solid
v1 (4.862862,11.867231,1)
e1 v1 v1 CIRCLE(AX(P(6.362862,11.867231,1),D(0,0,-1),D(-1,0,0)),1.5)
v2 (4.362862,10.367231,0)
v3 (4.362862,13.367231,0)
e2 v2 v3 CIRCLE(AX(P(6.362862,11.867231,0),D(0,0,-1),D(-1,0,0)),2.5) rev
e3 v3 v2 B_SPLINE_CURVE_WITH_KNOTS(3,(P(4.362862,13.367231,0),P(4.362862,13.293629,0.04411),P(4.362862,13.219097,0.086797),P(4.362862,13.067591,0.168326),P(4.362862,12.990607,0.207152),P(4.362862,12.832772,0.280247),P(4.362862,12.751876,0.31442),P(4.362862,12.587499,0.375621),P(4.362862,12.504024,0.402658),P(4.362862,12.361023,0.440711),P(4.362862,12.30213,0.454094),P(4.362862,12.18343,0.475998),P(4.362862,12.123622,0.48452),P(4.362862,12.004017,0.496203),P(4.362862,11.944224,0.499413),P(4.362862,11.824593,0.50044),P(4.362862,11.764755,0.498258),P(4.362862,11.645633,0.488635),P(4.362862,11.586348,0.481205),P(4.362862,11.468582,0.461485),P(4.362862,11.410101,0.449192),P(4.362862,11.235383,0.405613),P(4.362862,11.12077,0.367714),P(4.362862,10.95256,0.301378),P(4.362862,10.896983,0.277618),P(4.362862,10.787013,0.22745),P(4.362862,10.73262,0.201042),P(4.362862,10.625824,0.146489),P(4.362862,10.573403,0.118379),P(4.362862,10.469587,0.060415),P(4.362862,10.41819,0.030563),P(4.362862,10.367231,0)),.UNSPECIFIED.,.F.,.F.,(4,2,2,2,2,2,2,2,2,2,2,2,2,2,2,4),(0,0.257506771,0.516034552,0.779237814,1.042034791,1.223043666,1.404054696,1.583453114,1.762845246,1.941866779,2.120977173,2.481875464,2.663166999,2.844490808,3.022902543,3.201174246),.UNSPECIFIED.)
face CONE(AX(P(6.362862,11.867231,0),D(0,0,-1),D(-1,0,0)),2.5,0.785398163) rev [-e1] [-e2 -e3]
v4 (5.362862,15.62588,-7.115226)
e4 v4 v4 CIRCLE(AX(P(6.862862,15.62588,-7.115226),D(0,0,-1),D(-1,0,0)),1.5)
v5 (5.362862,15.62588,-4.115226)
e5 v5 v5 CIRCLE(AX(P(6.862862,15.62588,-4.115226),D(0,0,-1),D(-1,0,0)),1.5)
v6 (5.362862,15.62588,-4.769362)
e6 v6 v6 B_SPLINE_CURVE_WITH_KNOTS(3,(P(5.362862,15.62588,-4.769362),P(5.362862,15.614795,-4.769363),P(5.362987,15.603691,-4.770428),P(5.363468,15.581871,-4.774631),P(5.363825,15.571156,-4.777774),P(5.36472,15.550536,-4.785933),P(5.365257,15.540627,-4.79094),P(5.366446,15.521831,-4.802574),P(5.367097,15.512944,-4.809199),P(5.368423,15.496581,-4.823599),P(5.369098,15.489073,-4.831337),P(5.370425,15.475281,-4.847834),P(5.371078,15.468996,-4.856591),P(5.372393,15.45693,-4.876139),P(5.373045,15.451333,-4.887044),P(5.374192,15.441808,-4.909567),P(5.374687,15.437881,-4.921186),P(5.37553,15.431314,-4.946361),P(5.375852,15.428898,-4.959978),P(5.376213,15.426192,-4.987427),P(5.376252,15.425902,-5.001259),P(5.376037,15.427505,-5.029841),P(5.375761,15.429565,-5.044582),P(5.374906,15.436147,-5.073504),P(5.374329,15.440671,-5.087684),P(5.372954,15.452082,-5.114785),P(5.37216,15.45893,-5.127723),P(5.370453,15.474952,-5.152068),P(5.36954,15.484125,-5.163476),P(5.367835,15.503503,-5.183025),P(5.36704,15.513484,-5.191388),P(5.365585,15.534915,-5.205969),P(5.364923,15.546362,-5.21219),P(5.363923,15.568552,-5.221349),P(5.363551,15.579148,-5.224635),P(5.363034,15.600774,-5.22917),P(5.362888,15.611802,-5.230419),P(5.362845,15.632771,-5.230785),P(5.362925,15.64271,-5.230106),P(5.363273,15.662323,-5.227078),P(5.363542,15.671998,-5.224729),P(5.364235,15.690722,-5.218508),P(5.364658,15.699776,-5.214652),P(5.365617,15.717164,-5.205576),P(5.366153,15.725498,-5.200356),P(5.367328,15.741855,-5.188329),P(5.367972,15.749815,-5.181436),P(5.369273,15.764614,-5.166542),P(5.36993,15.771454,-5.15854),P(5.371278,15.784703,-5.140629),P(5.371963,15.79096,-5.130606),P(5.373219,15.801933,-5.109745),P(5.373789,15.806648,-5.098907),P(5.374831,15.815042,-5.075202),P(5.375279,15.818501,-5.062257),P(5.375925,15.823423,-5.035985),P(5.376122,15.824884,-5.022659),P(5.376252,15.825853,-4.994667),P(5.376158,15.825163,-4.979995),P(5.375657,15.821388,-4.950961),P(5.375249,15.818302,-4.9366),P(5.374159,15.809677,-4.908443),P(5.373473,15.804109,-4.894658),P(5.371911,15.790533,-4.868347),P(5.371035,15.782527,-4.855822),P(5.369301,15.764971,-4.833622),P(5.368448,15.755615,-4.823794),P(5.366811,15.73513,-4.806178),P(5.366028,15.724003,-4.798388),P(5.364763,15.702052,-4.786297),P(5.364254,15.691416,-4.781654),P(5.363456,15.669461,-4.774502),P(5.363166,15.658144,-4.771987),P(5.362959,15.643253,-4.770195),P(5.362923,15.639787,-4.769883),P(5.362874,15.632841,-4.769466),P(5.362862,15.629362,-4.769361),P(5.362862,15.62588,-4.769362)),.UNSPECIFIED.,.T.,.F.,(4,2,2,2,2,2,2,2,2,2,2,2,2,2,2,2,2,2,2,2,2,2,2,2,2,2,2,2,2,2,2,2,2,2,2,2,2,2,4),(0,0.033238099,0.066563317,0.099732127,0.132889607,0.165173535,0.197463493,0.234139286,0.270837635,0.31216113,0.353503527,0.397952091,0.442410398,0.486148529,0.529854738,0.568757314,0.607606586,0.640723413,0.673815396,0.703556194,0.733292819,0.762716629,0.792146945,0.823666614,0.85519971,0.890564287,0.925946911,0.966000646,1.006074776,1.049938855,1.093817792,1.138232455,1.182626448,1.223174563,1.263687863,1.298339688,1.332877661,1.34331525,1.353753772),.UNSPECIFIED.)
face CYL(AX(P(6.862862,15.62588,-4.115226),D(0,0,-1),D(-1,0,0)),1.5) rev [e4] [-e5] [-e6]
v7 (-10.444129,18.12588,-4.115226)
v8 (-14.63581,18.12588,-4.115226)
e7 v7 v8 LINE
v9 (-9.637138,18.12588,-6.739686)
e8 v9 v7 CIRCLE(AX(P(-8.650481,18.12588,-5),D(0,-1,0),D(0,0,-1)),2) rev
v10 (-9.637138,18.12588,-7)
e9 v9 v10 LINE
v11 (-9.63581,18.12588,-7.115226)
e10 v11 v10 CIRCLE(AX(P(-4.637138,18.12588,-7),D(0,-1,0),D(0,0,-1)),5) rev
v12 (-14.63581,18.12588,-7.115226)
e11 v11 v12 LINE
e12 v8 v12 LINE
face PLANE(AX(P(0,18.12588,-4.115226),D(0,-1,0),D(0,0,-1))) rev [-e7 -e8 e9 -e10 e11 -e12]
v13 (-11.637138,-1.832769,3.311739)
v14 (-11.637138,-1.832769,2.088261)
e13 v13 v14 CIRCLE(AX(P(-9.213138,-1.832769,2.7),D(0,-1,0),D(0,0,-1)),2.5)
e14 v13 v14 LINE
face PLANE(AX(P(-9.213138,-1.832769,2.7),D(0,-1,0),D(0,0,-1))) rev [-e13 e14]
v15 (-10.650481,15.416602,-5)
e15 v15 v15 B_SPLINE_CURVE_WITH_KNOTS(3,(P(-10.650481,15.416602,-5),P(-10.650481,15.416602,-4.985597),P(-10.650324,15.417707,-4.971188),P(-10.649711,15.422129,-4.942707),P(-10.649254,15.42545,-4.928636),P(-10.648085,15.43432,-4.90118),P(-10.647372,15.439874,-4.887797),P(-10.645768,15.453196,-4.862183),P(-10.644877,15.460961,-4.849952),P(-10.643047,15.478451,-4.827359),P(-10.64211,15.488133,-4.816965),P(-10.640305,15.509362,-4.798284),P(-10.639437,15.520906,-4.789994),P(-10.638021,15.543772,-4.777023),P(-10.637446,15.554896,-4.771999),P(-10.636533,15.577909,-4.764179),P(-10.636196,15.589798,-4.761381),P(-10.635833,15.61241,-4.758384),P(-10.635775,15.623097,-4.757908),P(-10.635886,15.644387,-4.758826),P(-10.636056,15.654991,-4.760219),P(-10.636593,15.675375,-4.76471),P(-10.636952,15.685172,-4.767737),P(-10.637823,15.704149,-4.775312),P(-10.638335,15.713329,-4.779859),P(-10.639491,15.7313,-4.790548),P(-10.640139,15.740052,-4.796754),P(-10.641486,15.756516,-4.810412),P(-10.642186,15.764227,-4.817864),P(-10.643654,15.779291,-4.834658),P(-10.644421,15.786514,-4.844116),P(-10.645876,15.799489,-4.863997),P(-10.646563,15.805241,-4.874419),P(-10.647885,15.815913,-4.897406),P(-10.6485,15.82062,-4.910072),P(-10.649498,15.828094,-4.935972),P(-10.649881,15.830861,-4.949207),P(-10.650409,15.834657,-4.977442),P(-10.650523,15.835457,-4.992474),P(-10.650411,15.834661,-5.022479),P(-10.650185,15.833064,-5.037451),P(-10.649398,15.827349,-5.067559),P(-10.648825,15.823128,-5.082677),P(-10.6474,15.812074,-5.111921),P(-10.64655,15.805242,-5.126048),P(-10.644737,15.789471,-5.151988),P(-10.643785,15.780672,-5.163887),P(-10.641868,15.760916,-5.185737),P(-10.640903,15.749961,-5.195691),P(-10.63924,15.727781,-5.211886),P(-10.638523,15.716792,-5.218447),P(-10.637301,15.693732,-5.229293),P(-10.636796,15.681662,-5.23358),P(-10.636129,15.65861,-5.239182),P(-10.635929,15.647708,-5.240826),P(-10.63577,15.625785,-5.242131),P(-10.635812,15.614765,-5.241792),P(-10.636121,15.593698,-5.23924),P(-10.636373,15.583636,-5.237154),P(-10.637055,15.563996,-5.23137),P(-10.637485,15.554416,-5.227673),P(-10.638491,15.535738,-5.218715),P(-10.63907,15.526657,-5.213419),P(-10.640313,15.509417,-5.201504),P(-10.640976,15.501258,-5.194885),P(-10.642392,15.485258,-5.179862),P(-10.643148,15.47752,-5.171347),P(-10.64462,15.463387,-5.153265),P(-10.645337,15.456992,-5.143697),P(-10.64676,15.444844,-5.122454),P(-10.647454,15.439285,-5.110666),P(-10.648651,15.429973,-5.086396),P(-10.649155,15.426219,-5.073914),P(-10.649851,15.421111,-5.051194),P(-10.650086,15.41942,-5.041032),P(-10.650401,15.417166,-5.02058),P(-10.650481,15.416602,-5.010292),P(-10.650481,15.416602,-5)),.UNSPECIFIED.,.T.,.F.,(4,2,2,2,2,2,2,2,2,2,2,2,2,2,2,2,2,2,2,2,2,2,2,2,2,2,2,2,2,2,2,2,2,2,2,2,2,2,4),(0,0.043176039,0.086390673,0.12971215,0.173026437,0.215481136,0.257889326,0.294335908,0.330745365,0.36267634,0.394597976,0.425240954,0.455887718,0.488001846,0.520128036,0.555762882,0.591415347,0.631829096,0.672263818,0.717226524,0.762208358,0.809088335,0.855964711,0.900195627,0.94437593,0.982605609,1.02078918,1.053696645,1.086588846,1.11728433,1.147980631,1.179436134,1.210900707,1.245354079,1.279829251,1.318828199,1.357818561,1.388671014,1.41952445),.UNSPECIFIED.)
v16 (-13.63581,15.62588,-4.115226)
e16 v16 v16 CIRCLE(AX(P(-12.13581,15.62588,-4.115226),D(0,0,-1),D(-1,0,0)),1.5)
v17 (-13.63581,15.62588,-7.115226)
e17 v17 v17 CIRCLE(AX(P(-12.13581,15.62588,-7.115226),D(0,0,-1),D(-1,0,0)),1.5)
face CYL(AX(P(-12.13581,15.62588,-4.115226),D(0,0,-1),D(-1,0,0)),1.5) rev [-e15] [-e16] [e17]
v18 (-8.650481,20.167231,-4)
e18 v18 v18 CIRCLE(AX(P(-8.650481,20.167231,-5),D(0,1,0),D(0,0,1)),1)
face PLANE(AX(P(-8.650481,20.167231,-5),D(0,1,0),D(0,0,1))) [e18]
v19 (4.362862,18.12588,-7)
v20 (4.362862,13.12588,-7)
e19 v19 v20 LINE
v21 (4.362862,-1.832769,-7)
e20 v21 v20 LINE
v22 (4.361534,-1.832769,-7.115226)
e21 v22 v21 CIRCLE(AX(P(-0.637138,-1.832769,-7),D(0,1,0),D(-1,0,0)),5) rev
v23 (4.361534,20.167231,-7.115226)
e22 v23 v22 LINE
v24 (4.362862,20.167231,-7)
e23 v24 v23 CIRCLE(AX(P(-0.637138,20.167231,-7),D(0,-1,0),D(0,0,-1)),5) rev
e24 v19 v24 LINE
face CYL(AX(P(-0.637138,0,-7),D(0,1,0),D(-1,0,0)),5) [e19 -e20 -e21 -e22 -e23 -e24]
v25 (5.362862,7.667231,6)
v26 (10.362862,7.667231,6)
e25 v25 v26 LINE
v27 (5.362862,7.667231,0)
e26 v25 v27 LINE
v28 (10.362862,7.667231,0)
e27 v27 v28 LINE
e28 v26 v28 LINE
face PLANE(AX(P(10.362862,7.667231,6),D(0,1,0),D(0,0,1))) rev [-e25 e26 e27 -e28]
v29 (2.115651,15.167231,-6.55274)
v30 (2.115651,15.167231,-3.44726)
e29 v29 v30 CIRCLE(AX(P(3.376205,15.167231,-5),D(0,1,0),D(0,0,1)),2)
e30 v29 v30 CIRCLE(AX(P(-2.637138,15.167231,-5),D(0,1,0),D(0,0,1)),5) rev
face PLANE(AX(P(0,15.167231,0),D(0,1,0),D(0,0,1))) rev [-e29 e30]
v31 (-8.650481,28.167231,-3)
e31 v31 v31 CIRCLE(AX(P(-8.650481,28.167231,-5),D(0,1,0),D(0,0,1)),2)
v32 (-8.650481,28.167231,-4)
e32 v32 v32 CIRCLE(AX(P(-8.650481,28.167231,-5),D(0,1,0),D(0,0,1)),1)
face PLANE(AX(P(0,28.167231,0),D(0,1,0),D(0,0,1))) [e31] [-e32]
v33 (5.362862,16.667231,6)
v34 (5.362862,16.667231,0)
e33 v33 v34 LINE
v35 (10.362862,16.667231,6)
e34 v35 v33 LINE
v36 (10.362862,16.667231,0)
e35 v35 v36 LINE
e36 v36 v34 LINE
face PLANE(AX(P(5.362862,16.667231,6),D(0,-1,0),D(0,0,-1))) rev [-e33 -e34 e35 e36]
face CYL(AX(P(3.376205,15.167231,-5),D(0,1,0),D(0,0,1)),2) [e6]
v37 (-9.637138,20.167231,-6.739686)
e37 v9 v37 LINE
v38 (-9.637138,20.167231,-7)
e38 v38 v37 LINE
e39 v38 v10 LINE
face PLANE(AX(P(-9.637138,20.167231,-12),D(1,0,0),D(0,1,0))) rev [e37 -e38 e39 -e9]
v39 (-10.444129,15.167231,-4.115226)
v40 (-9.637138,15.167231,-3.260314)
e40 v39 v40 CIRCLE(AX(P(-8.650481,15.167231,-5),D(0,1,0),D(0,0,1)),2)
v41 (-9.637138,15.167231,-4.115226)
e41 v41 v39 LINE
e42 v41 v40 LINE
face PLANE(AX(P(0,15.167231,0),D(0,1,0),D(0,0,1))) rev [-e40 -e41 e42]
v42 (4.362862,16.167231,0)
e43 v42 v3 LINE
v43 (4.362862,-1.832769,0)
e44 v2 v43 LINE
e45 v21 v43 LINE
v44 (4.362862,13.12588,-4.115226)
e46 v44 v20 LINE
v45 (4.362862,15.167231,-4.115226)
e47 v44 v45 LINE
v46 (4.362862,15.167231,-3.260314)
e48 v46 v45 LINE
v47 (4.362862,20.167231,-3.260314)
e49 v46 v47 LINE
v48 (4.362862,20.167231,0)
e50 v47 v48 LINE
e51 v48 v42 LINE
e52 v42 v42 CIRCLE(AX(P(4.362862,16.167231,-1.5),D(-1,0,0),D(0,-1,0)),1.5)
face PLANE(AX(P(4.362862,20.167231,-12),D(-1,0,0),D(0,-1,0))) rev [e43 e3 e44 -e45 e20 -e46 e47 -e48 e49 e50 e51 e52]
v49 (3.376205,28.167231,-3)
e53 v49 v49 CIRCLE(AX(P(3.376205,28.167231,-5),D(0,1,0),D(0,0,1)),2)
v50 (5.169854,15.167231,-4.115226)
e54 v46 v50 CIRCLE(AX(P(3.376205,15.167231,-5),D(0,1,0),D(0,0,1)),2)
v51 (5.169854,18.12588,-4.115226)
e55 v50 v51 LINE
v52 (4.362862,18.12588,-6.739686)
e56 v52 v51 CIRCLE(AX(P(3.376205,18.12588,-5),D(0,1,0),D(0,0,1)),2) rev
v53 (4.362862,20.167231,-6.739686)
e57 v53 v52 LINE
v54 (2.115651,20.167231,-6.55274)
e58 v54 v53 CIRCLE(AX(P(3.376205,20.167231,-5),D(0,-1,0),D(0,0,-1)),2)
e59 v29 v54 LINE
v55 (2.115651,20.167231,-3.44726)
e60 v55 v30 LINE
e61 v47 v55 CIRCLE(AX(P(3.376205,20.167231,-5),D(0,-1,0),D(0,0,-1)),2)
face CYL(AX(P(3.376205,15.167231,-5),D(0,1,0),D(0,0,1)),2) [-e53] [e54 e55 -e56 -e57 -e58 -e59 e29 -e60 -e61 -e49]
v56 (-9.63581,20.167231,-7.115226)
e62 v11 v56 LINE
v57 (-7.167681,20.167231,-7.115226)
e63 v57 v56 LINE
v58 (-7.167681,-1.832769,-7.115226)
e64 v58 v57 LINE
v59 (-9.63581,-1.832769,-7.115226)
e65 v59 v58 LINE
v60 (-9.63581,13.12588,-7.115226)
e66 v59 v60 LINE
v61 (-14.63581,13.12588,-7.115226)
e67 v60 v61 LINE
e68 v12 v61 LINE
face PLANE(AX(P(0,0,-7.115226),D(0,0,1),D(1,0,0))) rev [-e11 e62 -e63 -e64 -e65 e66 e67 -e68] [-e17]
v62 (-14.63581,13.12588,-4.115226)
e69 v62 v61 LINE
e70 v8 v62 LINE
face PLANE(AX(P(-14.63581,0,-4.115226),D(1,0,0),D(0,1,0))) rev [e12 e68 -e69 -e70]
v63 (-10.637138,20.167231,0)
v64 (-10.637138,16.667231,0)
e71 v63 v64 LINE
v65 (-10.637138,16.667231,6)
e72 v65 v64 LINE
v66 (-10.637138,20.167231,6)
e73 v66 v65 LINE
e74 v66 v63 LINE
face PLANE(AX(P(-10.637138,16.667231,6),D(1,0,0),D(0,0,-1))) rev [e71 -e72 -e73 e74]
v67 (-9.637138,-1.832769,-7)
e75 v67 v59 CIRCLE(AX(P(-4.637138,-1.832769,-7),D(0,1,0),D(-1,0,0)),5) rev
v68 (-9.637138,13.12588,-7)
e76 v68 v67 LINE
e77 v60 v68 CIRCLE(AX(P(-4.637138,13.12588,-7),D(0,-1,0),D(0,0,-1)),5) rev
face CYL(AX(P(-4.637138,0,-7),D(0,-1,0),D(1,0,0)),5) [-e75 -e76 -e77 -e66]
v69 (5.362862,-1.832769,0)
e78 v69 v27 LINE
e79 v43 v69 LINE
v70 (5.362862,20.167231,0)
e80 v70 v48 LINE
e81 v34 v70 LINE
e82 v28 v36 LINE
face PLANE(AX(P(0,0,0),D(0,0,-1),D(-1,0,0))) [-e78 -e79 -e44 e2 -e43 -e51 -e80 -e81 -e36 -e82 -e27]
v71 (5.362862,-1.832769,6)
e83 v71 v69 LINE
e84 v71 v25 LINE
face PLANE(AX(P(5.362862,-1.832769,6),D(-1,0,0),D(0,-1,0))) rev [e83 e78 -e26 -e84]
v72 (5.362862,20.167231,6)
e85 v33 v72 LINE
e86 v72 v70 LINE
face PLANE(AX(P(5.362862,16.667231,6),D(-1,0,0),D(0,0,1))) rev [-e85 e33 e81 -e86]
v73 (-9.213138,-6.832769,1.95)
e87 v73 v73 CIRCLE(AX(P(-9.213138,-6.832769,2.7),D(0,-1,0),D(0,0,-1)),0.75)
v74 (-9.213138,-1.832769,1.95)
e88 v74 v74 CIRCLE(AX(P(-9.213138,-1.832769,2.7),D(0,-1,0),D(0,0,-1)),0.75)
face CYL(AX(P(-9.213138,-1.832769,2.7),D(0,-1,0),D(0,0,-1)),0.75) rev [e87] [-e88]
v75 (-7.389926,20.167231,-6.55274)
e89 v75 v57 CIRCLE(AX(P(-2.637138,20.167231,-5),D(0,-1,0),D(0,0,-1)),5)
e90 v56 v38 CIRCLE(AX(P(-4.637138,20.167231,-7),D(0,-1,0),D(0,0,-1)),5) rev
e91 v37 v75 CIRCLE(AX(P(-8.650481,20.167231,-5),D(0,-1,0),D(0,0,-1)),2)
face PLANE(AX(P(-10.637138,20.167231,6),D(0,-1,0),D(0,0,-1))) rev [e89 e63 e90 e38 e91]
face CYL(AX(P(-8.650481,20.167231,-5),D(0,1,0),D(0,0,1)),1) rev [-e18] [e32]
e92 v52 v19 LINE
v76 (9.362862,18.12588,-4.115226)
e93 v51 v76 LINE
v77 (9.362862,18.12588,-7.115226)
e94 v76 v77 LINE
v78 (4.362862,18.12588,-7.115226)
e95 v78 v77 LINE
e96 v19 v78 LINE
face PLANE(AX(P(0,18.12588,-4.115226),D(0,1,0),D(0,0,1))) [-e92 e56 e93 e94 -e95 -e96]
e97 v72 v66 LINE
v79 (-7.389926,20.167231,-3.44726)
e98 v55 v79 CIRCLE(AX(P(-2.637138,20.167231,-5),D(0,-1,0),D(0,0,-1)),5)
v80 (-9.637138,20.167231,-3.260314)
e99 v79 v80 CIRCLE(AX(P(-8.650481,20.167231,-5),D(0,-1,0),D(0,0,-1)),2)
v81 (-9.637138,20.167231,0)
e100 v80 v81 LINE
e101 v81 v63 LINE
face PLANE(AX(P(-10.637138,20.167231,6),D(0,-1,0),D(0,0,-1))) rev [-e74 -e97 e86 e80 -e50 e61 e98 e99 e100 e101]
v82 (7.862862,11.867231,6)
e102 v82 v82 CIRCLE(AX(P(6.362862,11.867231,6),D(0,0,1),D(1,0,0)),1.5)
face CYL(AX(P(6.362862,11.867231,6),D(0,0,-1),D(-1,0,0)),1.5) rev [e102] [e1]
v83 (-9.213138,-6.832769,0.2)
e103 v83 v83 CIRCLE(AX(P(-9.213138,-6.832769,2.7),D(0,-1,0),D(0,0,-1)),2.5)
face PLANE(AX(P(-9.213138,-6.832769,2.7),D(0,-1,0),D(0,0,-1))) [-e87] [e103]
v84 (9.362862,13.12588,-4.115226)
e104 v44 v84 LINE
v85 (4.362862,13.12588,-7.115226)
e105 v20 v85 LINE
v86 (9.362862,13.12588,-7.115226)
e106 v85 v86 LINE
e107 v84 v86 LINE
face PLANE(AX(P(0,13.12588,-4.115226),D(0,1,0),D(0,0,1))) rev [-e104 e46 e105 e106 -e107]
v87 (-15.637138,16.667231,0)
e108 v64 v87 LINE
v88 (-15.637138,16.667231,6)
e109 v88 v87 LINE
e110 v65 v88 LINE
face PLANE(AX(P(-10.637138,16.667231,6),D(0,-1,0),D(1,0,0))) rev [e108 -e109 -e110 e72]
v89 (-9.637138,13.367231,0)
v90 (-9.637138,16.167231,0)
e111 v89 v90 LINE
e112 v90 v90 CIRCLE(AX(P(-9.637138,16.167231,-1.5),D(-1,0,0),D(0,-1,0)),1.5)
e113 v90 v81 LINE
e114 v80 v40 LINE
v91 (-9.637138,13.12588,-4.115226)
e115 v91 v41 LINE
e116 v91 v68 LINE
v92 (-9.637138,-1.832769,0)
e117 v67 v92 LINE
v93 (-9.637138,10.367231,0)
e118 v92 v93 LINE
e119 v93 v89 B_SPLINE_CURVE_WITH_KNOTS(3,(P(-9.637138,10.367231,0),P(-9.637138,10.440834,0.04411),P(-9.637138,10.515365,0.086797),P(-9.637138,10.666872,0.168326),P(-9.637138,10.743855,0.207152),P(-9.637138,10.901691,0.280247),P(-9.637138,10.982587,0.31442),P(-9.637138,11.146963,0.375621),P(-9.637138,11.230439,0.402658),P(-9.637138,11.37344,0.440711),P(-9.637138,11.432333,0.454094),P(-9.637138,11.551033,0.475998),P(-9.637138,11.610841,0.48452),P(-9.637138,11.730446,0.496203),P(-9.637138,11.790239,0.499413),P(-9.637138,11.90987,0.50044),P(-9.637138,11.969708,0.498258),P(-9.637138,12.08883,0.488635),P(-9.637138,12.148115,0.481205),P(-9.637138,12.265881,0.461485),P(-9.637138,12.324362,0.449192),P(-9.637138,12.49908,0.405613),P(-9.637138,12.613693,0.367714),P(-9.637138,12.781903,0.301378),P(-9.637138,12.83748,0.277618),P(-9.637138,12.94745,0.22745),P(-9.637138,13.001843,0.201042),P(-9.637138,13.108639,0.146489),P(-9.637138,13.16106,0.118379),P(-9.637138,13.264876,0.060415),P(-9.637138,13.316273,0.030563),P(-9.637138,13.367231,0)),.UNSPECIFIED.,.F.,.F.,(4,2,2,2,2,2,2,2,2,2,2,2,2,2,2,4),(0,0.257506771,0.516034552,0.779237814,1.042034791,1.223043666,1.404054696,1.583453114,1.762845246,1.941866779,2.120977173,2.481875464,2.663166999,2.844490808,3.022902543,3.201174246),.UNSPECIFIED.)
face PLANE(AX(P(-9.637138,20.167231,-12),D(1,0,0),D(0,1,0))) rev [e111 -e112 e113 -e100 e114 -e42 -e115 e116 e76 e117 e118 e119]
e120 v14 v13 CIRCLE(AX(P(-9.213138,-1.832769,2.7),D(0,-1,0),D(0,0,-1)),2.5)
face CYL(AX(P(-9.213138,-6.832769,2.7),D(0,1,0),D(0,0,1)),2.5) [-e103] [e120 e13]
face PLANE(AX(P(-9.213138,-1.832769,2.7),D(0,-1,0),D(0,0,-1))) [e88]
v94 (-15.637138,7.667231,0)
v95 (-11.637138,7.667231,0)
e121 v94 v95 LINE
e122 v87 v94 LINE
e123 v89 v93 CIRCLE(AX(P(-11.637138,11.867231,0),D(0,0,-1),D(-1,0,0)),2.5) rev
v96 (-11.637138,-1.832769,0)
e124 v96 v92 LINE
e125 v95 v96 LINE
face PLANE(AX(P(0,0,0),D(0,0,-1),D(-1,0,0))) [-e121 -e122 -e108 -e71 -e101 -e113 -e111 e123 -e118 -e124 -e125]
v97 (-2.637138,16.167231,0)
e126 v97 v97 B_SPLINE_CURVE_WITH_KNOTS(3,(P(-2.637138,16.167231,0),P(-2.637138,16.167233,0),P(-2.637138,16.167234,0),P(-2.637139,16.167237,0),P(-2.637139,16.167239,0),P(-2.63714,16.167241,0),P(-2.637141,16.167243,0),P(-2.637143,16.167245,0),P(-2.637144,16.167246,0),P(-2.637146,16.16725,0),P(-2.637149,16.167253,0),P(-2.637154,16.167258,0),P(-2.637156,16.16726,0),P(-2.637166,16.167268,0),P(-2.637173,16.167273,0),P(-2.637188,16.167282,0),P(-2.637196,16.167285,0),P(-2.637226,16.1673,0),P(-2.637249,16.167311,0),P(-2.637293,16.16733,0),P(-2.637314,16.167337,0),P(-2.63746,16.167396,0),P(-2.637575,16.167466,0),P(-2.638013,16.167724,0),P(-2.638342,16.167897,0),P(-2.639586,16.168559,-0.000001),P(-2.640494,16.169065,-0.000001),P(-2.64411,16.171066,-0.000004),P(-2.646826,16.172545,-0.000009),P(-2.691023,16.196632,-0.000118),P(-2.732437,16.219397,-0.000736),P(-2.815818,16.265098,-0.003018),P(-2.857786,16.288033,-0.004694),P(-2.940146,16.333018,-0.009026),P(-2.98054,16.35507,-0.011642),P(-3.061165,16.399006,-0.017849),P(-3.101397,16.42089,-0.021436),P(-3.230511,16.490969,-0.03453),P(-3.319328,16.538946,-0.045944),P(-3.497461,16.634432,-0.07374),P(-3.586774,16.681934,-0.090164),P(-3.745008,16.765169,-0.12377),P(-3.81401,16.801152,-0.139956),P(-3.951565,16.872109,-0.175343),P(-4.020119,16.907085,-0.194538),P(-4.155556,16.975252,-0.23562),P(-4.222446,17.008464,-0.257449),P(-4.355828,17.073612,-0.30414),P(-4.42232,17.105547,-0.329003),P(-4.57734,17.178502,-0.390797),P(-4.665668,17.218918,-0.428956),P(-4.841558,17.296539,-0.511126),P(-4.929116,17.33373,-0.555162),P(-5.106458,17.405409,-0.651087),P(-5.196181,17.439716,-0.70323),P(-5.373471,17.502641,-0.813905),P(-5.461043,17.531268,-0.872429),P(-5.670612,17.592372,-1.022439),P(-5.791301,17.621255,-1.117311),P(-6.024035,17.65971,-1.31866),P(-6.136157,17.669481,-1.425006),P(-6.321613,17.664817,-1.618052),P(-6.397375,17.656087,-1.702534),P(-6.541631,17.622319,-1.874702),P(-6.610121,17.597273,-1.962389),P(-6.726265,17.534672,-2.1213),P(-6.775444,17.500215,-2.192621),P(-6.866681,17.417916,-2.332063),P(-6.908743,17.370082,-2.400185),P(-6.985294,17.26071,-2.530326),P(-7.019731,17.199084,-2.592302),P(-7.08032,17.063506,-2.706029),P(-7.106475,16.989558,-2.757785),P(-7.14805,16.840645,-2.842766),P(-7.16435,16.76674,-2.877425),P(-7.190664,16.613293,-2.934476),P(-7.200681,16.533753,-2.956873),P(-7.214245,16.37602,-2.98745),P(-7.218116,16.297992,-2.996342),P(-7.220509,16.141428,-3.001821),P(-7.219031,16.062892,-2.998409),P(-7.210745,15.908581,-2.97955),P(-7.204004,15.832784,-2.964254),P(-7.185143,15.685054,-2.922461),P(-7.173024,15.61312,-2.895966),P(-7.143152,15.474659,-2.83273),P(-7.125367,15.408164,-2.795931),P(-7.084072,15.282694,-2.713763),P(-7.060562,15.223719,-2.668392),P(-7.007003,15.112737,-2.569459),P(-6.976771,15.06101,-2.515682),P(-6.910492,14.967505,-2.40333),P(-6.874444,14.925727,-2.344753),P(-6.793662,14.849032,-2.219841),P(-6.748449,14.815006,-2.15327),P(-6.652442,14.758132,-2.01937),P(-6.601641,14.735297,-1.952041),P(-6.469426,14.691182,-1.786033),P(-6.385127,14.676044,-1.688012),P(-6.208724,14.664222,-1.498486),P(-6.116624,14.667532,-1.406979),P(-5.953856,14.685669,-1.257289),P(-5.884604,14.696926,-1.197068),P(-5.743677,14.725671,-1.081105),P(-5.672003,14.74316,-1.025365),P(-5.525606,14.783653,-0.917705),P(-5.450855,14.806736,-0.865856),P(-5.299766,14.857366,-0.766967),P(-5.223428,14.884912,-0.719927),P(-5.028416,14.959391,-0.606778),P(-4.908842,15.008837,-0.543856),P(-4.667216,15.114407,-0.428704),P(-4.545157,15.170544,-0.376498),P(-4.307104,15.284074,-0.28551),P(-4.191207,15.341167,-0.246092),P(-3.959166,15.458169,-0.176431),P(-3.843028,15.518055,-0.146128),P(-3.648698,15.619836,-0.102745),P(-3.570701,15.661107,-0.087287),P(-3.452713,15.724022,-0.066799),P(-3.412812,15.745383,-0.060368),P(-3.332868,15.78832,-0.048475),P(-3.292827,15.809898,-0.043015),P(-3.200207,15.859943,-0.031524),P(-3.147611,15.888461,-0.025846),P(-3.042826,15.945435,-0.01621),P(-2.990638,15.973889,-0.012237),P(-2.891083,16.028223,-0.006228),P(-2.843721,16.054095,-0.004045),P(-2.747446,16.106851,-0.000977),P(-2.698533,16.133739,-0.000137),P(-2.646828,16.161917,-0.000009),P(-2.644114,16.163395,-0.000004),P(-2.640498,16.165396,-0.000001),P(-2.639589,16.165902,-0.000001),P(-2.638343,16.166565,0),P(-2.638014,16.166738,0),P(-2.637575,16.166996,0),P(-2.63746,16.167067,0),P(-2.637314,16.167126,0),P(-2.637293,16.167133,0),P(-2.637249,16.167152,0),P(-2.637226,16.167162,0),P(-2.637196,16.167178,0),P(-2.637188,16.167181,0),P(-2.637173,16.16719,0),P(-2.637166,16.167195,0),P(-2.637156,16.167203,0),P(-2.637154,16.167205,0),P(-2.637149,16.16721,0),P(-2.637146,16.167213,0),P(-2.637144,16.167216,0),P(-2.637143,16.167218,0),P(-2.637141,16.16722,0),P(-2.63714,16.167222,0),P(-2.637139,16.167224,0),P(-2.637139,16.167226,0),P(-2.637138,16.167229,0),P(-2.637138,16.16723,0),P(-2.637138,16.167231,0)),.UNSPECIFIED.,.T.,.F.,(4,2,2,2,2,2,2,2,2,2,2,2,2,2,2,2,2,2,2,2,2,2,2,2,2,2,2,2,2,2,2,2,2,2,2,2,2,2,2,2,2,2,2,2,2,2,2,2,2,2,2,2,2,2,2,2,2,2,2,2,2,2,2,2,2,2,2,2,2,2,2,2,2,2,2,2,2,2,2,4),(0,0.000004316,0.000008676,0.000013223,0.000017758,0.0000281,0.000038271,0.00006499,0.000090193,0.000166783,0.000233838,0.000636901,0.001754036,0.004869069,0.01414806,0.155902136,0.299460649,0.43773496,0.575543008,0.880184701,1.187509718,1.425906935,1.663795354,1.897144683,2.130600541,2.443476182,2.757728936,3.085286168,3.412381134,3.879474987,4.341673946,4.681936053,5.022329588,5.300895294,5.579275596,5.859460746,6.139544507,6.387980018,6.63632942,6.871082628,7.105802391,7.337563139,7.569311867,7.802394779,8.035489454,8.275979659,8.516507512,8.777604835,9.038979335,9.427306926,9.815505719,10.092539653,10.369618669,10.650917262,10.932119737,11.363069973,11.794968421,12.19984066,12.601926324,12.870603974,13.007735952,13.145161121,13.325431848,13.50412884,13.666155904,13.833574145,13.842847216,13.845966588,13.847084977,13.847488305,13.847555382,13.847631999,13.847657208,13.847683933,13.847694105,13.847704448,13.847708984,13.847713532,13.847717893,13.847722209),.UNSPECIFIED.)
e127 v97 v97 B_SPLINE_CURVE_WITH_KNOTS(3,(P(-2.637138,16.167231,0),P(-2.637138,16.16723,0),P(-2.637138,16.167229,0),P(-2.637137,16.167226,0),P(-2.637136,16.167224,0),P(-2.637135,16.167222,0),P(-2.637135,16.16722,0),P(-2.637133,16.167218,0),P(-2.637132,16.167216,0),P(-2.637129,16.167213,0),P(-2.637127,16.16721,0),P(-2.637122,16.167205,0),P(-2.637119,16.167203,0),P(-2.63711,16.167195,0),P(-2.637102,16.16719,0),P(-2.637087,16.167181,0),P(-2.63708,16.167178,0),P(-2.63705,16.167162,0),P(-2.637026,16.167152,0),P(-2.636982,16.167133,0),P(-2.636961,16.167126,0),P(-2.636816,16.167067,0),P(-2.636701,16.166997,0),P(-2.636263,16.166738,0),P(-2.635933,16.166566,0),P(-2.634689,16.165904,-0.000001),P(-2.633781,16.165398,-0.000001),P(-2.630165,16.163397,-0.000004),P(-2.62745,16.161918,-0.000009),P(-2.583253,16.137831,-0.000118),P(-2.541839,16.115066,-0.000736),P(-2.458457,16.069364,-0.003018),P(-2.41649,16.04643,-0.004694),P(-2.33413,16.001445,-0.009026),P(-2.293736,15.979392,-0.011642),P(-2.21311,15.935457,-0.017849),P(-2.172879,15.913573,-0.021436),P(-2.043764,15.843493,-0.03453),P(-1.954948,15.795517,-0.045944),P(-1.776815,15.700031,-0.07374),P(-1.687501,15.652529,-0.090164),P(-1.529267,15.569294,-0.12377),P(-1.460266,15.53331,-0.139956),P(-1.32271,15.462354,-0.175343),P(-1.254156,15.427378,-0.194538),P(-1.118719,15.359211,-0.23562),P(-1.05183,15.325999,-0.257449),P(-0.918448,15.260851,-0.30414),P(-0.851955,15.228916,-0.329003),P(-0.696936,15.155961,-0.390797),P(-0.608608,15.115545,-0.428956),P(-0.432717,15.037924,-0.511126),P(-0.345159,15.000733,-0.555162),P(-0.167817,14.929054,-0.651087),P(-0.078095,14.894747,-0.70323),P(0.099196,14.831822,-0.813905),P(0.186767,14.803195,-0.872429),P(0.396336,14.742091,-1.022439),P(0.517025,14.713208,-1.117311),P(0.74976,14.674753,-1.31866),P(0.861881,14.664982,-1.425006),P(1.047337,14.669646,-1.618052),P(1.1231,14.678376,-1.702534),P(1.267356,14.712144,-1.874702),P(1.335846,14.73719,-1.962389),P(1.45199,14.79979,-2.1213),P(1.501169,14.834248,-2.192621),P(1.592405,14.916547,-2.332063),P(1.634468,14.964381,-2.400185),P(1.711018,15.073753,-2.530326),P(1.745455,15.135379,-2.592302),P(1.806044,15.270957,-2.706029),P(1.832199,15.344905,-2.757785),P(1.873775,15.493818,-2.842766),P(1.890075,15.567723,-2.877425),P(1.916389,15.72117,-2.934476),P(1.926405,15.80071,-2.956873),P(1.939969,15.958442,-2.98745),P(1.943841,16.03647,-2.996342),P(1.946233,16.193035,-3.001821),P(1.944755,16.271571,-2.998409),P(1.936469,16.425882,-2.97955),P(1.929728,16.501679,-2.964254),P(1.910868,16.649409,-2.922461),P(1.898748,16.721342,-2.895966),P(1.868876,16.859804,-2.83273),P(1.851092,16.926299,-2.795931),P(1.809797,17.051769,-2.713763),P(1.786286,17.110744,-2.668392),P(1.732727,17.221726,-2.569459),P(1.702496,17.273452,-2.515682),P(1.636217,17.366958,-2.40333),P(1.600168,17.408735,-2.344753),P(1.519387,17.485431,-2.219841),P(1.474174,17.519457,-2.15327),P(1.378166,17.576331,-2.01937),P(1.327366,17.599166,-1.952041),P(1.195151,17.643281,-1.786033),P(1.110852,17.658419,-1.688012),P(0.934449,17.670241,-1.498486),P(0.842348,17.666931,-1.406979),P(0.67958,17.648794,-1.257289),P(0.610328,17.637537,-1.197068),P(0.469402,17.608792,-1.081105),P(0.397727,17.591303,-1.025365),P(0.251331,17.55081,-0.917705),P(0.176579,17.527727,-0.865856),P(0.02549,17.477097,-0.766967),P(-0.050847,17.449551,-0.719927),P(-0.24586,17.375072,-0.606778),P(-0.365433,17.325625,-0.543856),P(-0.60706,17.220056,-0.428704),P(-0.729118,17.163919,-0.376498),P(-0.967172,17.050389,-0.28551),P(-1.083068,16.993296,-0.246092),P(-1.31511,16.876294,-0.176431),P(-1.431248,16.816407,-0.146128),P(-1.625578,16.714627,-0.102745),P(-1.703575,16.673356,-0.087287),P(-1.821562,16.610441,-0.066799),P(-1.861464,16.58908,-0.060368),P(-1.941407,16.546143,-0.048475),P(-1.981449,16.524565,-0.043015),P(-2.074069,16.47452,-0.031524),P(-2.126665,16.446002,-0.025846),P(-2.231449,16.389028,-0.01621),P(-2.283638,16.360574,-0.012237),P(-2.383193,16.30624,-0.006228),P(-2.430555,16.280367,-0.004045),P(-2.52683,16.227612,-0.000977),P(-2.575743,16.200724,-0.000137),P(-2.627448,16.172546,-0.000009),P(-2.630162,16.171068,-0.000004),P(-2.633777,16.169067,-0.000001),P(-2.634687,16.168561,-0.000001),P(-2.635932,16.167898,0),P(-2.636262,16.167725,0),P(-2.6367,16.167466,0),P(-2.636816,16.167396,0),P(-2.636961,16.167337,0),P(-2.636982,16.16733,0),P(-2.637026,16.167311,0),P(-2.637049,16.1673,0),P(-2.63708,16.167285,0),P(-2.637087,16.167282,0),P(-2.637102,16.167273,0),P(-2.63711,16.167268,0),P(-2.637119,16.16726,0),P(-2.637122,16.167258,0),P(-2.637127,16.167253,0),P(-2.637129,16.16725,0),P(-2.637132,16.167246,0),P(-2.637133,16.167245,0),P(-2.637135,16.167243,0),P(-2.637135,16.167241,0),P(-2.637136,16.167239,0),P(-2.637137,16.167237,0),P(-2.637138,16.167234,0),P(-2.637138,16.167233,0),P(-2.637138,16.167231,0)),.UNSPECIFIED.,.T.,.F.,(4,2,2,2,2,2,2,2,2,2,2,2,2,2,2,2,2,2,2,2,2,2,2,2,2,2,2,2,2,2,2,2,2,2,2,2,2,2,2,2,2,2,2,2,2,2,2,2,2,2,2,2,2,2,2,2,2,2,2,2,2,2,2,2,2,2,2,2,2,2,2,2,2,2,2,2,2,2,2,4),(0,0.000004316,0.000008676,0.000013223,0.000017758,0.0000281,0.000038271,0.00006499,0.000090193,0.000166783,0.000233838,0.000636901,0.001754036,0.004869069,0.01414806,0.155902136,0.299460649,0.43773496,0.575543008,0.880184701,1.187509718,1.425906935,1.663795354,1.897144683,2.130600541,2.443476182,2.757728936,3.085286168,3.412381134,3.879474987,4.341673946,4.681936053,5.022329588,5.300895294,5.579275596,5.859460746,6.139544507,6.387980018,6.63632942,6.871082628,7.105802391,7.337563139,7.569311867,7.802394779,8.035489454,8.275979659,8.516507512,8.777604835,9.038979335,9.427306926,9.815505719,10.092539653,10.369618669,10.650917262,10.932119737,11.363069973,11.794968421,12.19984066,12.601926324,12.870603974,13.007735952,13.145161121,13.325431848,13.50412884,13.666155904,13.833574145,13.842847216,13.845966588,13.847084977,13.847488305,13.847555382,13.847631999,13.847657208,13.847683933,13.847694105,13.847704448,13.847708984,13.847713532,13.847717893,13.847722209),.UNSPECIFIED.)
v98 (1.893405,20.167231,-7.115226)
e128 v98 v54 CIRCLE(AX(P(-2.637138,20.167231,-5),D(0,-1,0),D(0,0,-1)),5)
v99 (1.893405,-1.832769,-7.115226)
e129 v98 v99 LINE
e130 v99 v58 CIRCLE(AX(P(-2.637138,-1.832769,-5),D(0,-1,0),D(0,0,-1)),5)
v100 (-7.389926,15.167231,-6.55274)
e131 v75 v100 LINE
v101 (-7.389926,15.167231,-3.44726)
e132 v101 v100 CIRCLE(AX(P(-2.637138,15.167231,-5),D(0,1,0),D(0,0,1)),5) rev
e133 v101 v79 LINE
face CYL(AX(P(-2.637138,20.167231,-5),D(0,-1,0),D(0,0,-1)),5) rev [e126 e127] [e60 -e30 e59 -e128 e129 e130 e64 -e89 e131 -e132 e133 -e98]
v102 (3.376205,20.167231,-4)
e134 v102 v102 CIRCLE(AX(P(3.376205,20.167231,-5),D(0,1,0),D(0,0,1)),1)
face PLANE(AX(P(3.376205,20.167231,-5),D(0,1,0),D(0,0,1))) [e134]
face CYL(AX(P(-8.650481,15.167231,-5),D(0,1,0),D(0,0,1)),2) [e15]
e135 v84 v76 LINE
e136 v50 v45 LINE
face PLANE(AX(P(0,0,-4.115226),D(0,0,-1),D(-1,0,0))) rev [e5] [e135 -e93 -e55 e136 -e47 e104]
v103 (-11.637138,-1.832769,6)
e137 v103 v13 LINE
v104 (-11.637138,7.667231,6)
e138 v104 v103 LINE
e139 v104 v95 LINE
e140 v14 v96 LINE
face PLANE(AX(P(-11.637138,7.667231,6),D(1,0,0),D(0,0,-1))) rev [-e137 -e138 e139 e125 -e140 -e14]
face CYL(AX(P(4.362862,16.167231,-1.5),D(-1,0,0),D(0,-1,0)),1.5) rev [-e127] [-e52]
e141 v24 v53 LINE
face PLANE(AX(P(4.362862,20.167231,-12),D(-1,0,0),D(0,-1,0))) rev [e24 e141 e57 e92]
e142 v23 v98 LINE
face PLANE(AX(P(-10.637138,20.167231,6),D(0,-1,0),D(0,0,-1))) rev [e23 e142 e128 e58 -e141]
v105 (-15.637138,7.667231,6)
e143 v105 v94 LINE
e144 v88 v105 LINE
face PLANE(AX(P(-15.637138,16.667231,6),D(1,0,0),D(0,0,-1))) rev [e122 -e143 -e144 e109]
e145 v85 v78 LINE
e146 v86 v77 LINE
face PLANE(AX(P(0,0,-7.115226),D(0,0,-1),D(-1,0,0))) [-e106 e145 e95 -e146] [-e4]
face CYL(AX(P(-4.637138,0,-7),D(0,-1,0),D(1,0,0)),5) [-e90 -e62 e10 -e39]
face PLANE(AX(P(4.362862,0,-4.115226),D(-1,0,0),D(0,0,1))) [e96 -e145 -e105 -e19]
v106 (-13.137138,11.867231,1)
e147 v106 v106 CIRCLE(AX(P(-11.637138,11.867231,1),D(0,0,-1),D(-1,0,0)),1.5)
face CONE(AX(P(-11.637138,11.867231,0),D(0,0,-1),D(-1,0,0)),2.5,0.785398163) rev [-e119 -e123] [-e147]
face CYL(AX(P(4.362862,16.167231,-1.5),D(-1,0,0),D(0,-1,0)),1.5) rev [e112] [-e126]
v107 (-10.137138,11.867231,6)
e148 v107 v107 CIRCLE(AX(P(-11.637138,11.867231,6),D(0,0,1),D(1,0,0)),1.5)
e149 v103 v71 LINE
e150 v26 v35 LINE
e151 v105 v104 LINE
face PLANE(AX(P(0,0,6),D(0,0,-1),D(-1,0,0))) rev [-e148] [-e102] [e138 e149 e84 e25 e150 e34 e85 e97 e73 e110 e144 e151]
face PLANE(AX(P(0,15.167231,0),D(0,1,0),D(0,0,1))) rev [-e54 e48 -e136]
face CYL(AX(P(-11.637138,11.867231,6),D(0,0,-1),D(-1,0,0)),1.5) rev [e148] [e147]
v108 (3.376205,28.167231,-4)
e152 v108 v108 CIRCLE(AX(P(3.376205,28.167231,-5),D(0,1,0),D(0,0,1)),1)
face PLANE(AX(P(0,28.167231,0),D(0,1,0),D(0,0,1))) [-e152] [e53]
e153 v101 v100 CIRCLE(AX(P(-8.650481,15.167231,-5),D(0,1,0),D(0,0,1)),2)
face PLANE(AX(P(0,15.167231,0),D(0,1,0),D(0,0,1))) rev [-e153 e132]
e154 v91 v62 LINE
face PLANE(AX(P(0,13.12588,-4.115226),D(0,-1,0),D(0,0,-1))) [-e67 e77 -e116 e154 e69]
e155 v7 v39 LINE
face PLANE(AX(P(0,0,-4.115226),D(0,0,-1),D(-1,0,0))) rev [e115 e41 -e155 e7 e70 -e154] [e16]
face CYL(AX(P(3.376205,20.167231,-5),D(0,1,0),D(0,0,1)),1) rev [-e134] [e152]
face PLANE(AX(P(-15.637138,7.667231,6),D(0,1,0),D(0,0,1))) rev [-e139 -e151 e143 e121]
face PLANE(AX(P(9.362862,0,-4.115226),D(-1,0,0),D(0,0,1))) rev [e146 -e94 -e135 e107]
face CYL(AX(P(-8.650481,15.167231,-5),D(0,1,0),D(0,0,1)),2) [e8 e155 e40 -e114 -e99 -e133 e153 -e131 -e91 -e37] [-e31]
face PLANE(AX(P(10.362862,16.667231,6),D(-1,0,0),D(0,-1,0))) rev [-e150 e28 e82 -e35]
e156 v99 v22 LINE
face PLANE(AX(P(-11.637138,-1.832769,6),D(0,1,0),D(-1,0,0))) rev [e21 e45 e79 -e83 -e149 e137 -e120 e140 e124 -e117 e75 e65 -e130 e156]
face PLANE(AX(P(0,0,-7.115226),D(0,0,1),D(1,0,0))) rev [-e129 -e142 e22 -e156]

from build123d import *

# Parameters (mm, degrees)
ESBO_O1_R                      = 1.5
RESSALTO_EXTRUS_O1_DEPTH       = 6
ESBO_O6_W                      = 14
ESBO_O6_H                      = 22
RESSALTO_EXTRUS_O3_DEPTH       = 12
ESBO_O7_R                      = 5
CORTE_EXTRUS_O4_DEPTH          = 30.538450843
FILETE3_R                      = 5
RESSALTO_EXTRUS_O13_DEPTH      = 8
RESSALTO_EXTRUS_O13_DEPTH_BACK = 5
ESBO_O15_R                     = 2
ESBO_O17_R                     = 1
CORTE_EXTRUS_O6_DEPTH          = 8
ESBO_O21_W                     = 22.669500521
ESBO_O21_H                     = 31.157259519
CORTE_EXTRUS_O8_DEPTH          = 6
ESBO_O22_W                     = 5
ESBO_O22_H                     = 5
ESBO_O22_R                     = 1.5
RESSALTO_EXTRUS_O15_DEPTH      = 3
ESBO_O23_R                     = 2.5
RESSALTO_EXTRUS_O16_DEPTH      = 5
ESBO_O24_R                     = 0.75
CORTE_EXTRUS_O9_DEPTH          = 5
CHANFRO5_SIZE                  = 1
ESBO_O25_R                     = 1.5
CORTE_EXTRUS_O11_DEPTH         = 14


with BuildPart() as part:
    # Esboço1 → Ressalto-extrusão1 (new body)
    with BuildSketch(Plane.XY):
        Polygon((-11.637137788, -1.832768542), (5.362862212, -1.832768542), (5.362862212, 7.667231458), (10.362862212, 7.667231458), (10.362862212, 16.667231458), (5.362862212, 16.667231458), (5.362862212, 20.167231458), (-10.637137788, 20.167231458), (-10.637137788, 16.667231458), (-15.637137788, 16.667231458), (-15.637137788, 7.667231458), (-11.637137788, 7.667231458), align=None)
        with Locations((6.362862212, 11.867231458)):
            Circle(ESBO_O1_R, mode=Mode.SUBTRACT)
        with Locations((-11.637137788, 11.867231458)):
            Circle(ESBO_O1_R, mode=Mode.SUBTRACT)
    extrude(amount=RESSALTO_EXTRUS_O1_DEPTH)

    # Esboço6 → Ressalto-extrusão3 (add)
    with BuildSketch(Plane(origin=(0, 0, 0), x_dir=(-1, 0, 0), z_dir=(0, 0, -1))):
        with Locations((2.637137788, 9.167231458)):
            Rectangle(ESBO_O6_W, ESBO_O6_H)
    extrude(amount=RESSALTO_EXTRUS_O3_DEPTH)

    # Esboço7 → Corte-extrusão4 (cut, through all)
    with BuildSketch(Plane.XZ.offset(1.832768542)):
        with Locations(Location((-2.637137788, -5, 0), (0, 0, 270))):
            Circle(ESBO_O7_R)
    extrude(amount=-CORTE_EXTRUS_O4_DEPTH, mode=Mode.SUBTRACT)

    # Filete3
    filete3_edges = [part.edges().sort_by_distance(p)[0] for p in [
        (4.362862212, 9.167231458, -12),
        (-9.637137788, 9.167231458, -12),
    ]]
    fillet(filete3_edges, radius=FILETE3_R)

    # Esboço15 → Ressalto-extrusão13 (add, two sides: drawn at the far end of the back side and taken through both)
    with BuildSketch(Plane(origin=(0, 20.167231458, 0), x_dir=(1, 0, 0), z_dir=(0, 1, 0)).offset(-RESSALTO_EXTRUS_O13_DEPTH_BACK)):
        with Locations(Location((-8.650480796, 5, 0), (0, 0, 270))):
            Circle(ESBO_O15_R)
        with Locations(Location((3.376205221, 5, 0), (0, 0, 270))):
            Circle(ESBO_O15_R)
    extrude(amount=RESSALTO_EXTRUS_O13_DEPTH + RESSALTO_EXTRUS_O13_DEPTH_BACK)

    # Esboço17 → Corte-extrusão6 (cut)
    with BuildSketch(Plane(origin=(0, 28.167231458, 0), x_dir=(1, 0, 0), z_dir=(0, 1, 0))):
        with Locations(Location((-8.650480796, 5, 0), (0, 0, 270))):
            Circle(ESBO_O17_R)
        with Locations(Location((3.376205221, 5, 0), (0, 0, 270))):
            Circle(ESBO_O17_R)
    extrude(amount=-CORTE_EXTRUS_O6_DEPTH, mode=Mode.SUBTRACT)

    # Esboço21 → Corte-extrusão8 (cut)
    with BuildSketch(Plane(origin=(0, 0, -7.115225733), x_dir=(1, 0, 0), z_dir=(0, 0, -1))):
        with Locations((-2.778124877, -9.864448806)):
            Rectangle(ESBO_O21_W, ESBO_O21_H)
    extrude(amount=CORTE_EXTRUS_O8_DEPTH, mode=Mode.SUBTRACT)

    # Esboço22 → Ressalto-extrusão15 (add)
    # profile 1 of 2: a face of its own
    with BuildSketch(Plane(origin=(0, 0, -7.115225733), x_dir=(1, 0, 0), z_dir=(0, 0, -1))):
        with Locations((-12.135809914, -15.625880271)):
            Rectangle(ESBO_O22_W, ESBO_O22_H)
        with Locations(Location((-12.135809914, -15.625880271, 0), (0, 0, 180))):
            Circle(ESBO_O22_R, mode=Mode.SUBTRACT)
    # profile 2 of 2: a face of its own
    with BuildSketch(Plane(origin=(0, 0, -7.115225733), x_dir=(1, 0, 0), z_dir=(0, 0, -1))):
        with Locations((6.862862212, -15.625880271)):
            Rectangle(ESBO_O22_W, ESBO_O22_H)
        with Locations(Location((6.862862212, -15.625880271, 0), (0, 0, 180))):
            Circle(ESBO_O22_R, mode=Mode.SUBTRACT)
    extrude(amount=-RESSALTO_EXTRUS_O15_DEPTH)

    # Esboço23 → Ressalto-extrusão16 (add)
    with BuildSketch(Plane.XZ.offset(1.832768542)):
        with Locations(Location((-9.213137788, 2.7, 0), (0, 0, 165.836166317))):
            Circle(ESBO_O23_R)
    extrude(amount=RESSALTO_EXTRUS_O16_DEPTH)

    # Esboço24 → Corte-extrusão9 (cut)
    with BuildSketch(Plane.XZ.offset(6.832768542)):
        with Locations(Location((-9.213137788, 2.7, 0), (0, 0, 270))):
            Circle(ESBO_O24_R)
    extrude(amount=-CORTE_EXTRUS_O9_DEPTH, mode=Mode.SUBTRACT)

    # Chanfro5
    # the kernel refuses this chamfer: 1 mm, written as the material it takes off along each edge
    with BuildSketch(Plane(origin=(6.362862212, 11.867231458, 0), x_dir=(1, 0, 0), z_dir=(0, -1, 0))) as chanfro5_piece_1_section:
        Polygon((1.5 + CHANFRO5_SIZE, 0), (1.5, CHANFRO5_SIZE), (1.5, 0), align=None)
    chanfro5_piece_1 = revolve(axis=Axis((6.362862212, 11.867231458, 0), (0, 0, 1)), mode=Mode.PRIVATE)
    chanfro5_piece_1 = split(chanfro5_piece_1, bisect_by=Plane(origin=(4.362862212, 13.893105183, 0.134898453), z_dir=(1, 0, 0)), keep=Keep.TOP, mode=Mode.PRIVATE)
    add(chanfro5_piece_1, mode=Mode.SUBTRACT)
    with BuildSketch(Plane(origin=(-11.637137788, 11.867231458, 0), x_dir=(1, 0, 0), z_dir=(0, -1, 0))) as chanfro5_piece_2_section:
        Polygon((1.5 + CHANFRO5_SIZE, 0), (1.5, CHANFRO5_SIZE), (1.5, 0), align=None)
    chanfro5_piece_2 = revolve(axis=Axis((-11.637137788, 11.867231458, 0), (0, 0, 1)), mode=Mode.PRIVATE)
    chanfro5_piece_2 = split(chanfro5_piece_2, bisect_by=Plane(origin=(-9.637137788, 11.867231458, 0.487087965), z_dir=(-1, 0, 0)), keep=Keep.TOP, mode=Mode.PRIVATE)
    add(chanfro5_piece_2, mode=Mode.SUBTRACT)

    # Esboço25 → Corte-extrusão11 (cut)
    with BuildSketch(Plane.ZY.offset(9.637137788)):
        with Locations((-1.5, 16.167231458)):
            Circle(ESBO_O25_R)
    extrude(amount=-CORTE_EXTRUS_O11_DEPTH, mode=Mode.SUBTRACT)


solid = part.part
